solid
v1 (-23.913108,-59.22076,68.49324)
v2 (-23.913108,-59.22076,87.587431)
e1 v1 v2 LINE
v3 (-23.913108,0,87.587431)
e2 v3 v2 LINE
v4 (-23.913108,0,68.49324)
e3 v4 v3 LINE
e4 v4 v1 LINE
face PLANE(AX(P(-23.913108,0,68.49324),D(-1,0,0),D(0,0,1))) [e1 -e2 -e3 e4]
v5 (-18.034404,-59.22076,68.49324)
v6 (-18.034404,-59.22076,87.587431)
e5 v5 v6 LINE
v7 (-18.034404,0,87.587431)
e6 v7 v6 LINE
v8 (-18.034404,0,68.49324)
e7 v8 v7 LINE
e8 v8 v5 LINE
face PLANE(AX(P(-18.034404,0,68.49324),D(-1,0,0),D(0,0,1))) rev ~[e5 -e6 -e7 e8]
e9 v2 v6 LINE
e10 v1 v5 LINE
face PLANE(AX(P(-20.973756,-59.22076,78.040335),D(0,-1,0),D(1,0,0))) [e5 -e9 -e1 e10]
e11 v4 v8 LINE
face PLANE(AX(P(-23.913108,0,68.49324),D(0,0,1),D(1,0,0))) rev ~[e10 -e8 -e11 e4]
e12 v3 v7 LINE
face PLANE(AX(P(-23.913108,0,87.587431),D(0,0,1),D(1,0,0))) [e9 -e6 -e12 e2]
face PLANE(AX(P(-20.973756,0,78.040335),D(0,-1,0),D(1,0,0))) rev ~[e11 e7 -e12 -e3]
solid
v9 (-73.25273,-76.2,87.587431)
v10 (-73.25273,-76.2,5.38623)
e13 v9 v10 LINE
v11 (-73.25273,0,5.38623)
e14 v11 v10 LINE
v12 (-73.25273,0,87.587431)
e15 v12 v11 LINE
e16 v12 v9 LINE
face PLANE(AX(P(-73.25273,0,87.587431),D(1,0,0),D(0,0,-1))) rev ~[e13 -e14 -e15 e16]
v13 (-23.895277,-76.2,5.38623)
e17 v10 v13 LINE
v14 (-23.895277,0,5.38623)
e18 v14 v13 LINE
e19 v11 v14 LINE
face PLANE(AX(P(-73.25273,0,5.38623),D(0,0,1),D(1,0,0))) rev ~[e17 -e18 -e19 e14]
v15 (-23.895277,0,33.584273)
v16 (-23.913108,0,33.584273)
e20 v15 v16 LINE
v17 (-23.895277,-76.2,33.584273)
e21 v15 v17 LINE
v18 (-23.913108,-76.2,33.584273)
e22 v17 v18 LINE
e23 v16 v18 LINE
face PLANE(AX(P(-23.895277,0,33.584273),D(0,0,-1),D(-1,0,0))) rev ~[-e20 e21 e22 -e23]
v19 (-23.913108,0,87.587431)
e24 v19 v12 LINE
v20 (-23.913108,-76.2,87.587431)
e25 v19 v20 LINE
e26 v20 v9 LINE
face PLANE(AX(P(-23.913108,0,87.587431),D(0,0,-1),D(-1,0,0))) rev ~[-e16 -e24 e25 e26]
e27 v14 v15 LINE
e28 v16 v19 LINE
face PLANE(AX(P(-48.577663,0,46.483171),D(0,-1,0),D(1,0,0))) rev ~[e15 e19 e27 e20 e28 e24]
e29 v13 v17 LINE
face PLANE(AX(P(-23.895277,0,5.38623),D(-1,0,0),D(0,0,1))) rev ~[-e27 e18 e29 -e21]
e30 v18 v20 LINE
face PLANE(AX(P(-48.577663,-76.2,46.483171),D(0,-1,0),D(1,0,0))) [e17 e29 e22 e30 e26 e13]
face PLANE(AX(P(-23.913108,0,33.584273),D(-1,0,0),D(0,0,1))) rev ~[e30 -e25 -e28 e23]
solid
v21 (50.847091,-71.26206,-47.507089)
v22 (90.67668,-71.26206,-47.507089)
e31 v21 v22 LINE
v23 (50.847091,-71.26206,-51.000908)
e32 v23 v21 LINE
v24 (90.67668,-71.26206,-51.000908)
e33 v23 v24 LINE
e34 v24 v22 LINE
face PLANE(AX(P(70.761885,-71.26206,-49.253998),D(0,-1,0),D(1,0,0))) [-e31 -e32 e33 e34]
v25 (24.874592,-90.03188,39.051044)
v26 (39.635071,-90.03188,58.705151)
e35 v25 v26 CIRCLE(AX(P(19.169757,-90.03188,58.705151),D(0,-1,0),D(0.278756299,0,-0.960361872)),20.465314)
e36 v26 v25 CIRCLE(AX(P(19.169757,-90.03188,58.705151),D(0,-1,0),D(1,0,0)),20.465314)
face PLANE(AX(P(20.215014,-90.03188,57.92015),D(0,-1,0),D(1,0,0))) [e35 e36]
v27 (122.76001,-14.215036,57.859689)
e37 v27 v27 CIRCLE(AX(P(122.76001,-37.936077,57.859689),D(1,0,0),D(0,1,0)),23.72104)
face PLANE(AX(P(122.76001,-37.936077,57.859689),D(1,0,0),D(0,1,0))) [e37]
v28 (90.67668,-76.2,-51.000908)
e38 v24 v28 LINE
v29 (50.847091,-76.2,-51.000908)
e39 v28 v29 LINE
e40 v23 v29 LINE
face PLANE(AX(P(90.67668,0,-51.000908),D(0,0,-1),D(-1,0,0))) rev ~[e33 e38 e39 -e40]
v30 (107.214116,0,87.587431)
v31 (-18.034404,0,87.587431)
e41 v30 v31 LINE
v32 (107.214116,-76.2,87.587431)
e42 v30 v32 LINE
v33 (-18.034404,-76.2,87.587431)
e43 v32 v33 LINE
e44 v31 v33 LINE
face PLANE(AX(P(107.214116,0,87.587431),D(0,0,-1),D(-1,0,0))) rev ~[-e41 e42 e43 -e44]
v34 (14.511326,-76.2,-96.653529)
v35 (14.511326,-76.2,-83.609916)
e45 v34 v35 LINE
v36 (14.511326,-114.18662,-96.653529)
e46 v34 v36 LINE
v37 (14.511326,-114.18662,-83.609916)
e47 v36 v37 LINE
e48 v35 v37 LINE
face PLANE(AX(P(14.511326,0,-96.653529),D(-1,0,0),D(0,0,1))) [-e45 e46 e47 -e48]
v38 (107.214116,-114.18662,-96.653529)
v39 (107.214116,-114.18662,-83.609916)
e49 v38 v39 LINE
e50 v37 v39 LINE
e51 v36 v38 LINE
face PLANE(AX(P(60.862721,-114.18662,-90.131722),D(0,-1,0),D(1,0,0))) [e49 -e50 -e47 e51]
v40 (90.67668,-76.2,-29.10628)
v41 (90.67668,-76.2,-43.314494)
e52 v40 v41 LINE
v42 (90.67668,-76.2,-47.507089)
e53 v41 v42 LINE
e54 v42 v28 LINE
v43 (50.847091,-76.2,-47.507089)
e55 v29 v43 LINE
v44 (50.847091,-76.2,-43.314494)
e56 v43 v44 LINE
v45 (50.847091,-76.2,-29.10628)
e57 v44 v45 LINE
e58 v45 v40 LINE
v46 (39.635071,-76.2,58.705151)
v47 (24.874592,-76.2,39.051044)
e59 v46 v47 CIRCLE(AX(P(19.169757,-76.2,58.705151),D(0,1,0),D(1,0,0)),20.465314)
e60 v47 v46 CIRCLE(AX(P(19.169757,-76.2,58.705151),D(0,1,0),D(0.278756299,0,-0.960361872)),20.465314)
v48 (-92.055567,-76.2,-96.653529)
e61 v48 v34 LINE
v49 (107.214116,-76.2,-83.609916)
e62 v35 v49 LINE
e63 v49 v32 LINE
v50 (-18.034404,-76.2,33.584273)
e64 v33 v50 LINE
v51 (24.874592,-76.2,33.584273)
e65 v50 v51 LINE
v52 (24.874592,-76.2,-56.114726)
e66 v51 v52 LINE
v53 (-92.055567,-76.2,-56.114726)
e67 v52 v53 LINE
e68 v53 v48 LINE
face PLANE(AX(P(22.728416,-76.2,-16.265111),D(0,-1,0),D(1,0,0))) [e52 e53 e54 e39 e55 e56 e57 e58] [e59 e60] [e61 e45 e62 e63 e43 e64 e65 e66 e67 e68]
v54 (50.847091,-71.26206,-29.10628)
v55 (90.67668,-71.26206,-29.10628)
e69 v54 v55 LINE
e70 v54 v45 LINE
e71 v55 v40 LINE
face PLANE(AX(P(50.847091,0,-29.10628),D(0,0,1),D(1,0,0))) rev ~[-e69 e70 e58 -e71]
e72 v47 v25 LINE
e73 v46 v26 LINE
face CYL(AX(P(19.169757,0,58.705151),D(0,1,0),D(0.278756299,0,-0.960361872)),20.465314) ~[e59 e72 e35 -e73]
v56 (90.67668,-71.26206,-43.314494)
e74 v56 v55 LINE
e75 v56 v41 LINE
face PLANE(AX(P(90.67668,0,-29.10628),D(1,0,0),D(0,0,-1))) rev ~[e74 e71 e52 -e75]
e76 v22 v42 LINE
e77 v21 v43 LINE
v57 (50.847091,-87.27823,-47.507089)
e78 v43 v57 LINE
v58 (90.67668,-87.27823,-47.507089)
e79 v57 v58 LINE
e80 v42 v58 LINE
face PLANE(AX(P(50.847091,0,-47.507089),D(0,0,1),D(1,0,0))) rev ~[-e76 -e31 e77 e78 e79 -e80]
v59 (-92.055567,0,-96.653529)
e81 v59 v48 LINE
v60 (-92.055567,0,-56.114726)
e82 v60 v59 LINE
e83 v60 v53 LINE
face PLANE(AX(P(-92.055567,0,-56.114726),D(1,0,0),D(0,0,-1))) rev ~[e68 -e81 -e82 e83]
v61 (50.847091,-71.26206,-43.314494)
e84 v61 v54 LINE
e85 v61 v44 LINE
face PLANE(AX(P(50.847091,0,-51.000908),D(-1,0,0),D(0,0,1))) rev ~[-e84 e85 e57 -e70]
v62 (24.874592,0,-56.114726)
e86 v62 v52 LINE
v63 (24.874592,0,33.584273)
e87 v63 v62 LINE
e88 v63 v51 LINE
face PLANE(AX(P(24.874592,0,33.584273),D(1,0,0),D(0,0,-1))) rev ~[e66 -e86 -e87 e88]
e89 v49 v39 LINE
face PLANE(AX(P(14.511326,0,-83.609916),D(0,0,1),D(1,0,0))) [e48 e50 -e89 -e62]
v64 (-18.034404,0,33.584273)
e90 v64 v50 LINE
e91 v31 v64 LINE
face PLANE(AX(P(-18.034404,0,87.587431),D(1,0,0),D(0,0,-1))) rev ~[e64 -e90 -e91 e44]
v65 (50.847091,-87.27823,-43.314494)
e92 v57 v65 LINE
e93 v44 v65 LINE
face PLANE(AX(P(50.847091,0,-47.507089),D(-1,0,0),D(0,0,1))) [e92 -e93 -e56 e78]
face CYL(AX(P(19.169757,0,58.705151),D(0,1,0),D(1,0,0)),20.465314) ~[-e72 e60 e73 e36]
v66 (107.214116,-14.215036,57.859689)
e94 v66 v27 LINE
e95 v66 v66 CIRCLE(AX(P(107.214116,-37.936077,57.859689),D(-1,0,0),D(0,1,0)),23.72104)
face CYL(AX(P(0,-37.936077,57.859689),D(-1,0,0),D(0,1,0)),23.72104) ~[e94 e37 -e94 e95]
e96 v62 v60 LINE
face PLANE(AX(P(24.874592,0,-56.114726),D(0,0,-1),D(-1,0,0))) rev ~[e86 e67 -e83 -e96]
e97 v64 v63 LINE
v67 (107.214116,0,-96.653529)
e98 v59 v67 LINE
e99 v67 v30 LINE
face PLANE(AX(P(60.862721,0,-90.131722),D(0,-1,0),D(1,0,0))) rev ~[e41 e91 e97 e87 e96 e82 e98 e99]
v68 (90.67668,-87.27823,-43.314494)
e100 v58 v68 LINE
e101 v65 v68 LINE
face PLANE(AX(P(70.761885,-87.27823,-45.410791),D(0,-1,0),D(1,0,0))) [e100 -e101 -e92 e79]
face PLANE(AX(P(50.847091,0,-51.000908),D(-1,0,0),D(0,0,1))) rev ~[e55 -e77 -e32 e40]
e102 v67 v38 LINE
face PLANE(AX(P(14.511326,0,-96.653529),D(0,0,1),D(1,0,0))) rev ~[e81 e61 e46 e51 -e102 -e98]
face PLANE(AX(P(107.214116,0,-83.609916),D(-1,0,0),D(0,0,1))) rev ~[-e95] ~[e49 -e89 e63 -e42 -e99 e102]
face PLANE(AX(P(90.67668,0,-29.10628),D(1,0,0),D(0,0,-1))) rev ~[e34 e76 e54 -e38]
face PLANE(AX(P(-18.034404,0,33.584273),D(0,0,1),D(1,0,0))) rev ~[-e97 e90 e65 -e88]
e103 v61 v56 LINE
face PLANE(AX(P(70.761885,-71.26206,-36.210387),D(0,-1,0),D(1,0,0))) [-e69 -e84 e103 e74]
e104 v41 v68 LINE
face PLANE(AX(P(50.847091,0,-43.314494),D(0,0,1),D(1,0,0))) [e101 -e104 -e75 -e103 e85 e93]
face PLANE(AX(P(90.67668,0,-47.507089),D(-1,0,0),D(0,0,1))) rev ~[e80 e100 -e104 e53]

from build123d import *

# Parameters (mm, degrees)
F2_DEPTH = 76.2
F3_DEPTH = 90.03188
F0_W     = 39.8295894265
F0_H     = 14.2082143575
F0_H_2   = 3.4938193858
F4_DEPTH = 71.26206
F0_H_3   = 4.1925944388
F5_DEPTH = 87.27823
F0_W_2   = 92.7027892321
F0_H_4   = 13.0436122417
F6_DEPTH = 114.18662
F0_W_3   = 5.8787036687
F0_H_5   = 19.0941914916
F7_DEPTH = 59.22076
F1_R     = 23.7210403161
F8_DEPTH = 122.76001


with BuildPart() as f2:
    # F0 (on Front) → F2 (new body)
    with BuildSketch(Plane.XZ):
        Polygon((-73.2527300715, 87.5874310732), (-73.2527300715, 5.3862300701), (-23.8952767104, 5.3862300701), (-23.8952767104, 33.5842727341), (-23.9131078124, 33.5842727341), (-23.9131078124, 68.4932395816), (-23.9131078124, 87.5874310732), align=None)
    extrude(amount=F2_DEPTH)


with BuildPart() as f2b:
    # F0 (on Front) → F2, piece 2 (new body)
    with BuildSketch(Plane.XZ):
        Polygon((-18.0344041437, 68.4932395816), (-18.0344041437, 33.5842727341), (24.8745921999, 33.5842727341), (24.8745921999, -56.1147257686), (-92.0555666089, -56.1147257686), (-92.0555666089, -96.6535285115), (14.5113263279, -96.6535285115), (14.5113263279, -83.6099162698), (107.2141155601, -83.6099162698), (107.2141155601, 87.5874310732), (-18.0344041437, 87.5874310732), align=None)
        Polygon((90.6766802073, -51.0009080172), (50.8470907807, -51.0009080172), (50.8470907807, -47.5070886314), (50.8470907807, -43.3144941926), (50.8470907807, -29.1062798351), (90.6766802073, -29.1062798351), (90.6766802073, -43.3144941926), (90.6766802073, -47.5070886314), align=None, mode=Mode.SUBTRACT)
        with BuildLine():
            ThreePointArc((39.6350706735, 58.7051510811), (35.5340520557, 46.4153622337), (24.8745921999, 39.0510442613))
            ThreePointArc((24.8745921999, 39.0510442613), (2.8054622296, 70.9949399285), (39.6350706735, 58.7051510811))
        make_face(mode=Mode.SUBTRACT)
    extrude(amount=F2_DEPTH)

    # F0 (on Front) → F3 (join)
    with BuildSketch(Plane.XZ):
        with BuildLine():
            ThreePointArc((39.6350706735, 58.7051510811), (2.8054622296, 70.9949399285), (24.8745921999, 39.0510442613))
            ThreePointArc((24.8745921999, 39.0510442613), (35.5340520557, 46.4153622337), (39.6350706735, 58.7051510811))
        make_face()
    extrude(amount=F3_DEPTH)

    # F0 (on Front) → F4 (join)
    with BuildSketch(Plane.XZ):
        with Locations((70.761885494, -36.2103870139)):
            Rectangle(F0_W, F0_H)
        with Locations((70.761885494, -49.2539983243)):
            Rectangle(F0_W, F0_H_2)
    extrude(amount=F4_DEPTH)

    # F0 (on Front) → F5 (join)
    with BuildSketch(Plane.XZ):
        with Locations((70.761885494, -45.410791412)):
            Rectangle(F0_W, F0_H_3)
    extrude(amount=F5_DEPTH)

    # F0 (on Front) → F6 (join)
    with BuildSketch(Plane.XZ):
        with Locations((60.862720944, -90.1317223907)):
            Rectangle(F0_W_2, F0_H_4)
    extrude(amount=F6_DEPTH)

    # F1 (on Right) → F8 (join)
    with BuildSketch(Plane.YZ):
        with Locations((-37.9360765219, 57.8596889973)):
            Circle(F1_R)
    extrude(amount=F8_DEPTH)


with BuildPart() as f7:
    # F0 (on Front) → F7 (new body)
    with BuildSketch(Plane.XZ):
        with Locations((-20.973755978, 78.0403353274)):
            Rectangle(F0_W_3, F0_H_5)
    extrude(amount=F7_DEPTH)


solid = Compound([f2.part, f2b.part, f7.part])
